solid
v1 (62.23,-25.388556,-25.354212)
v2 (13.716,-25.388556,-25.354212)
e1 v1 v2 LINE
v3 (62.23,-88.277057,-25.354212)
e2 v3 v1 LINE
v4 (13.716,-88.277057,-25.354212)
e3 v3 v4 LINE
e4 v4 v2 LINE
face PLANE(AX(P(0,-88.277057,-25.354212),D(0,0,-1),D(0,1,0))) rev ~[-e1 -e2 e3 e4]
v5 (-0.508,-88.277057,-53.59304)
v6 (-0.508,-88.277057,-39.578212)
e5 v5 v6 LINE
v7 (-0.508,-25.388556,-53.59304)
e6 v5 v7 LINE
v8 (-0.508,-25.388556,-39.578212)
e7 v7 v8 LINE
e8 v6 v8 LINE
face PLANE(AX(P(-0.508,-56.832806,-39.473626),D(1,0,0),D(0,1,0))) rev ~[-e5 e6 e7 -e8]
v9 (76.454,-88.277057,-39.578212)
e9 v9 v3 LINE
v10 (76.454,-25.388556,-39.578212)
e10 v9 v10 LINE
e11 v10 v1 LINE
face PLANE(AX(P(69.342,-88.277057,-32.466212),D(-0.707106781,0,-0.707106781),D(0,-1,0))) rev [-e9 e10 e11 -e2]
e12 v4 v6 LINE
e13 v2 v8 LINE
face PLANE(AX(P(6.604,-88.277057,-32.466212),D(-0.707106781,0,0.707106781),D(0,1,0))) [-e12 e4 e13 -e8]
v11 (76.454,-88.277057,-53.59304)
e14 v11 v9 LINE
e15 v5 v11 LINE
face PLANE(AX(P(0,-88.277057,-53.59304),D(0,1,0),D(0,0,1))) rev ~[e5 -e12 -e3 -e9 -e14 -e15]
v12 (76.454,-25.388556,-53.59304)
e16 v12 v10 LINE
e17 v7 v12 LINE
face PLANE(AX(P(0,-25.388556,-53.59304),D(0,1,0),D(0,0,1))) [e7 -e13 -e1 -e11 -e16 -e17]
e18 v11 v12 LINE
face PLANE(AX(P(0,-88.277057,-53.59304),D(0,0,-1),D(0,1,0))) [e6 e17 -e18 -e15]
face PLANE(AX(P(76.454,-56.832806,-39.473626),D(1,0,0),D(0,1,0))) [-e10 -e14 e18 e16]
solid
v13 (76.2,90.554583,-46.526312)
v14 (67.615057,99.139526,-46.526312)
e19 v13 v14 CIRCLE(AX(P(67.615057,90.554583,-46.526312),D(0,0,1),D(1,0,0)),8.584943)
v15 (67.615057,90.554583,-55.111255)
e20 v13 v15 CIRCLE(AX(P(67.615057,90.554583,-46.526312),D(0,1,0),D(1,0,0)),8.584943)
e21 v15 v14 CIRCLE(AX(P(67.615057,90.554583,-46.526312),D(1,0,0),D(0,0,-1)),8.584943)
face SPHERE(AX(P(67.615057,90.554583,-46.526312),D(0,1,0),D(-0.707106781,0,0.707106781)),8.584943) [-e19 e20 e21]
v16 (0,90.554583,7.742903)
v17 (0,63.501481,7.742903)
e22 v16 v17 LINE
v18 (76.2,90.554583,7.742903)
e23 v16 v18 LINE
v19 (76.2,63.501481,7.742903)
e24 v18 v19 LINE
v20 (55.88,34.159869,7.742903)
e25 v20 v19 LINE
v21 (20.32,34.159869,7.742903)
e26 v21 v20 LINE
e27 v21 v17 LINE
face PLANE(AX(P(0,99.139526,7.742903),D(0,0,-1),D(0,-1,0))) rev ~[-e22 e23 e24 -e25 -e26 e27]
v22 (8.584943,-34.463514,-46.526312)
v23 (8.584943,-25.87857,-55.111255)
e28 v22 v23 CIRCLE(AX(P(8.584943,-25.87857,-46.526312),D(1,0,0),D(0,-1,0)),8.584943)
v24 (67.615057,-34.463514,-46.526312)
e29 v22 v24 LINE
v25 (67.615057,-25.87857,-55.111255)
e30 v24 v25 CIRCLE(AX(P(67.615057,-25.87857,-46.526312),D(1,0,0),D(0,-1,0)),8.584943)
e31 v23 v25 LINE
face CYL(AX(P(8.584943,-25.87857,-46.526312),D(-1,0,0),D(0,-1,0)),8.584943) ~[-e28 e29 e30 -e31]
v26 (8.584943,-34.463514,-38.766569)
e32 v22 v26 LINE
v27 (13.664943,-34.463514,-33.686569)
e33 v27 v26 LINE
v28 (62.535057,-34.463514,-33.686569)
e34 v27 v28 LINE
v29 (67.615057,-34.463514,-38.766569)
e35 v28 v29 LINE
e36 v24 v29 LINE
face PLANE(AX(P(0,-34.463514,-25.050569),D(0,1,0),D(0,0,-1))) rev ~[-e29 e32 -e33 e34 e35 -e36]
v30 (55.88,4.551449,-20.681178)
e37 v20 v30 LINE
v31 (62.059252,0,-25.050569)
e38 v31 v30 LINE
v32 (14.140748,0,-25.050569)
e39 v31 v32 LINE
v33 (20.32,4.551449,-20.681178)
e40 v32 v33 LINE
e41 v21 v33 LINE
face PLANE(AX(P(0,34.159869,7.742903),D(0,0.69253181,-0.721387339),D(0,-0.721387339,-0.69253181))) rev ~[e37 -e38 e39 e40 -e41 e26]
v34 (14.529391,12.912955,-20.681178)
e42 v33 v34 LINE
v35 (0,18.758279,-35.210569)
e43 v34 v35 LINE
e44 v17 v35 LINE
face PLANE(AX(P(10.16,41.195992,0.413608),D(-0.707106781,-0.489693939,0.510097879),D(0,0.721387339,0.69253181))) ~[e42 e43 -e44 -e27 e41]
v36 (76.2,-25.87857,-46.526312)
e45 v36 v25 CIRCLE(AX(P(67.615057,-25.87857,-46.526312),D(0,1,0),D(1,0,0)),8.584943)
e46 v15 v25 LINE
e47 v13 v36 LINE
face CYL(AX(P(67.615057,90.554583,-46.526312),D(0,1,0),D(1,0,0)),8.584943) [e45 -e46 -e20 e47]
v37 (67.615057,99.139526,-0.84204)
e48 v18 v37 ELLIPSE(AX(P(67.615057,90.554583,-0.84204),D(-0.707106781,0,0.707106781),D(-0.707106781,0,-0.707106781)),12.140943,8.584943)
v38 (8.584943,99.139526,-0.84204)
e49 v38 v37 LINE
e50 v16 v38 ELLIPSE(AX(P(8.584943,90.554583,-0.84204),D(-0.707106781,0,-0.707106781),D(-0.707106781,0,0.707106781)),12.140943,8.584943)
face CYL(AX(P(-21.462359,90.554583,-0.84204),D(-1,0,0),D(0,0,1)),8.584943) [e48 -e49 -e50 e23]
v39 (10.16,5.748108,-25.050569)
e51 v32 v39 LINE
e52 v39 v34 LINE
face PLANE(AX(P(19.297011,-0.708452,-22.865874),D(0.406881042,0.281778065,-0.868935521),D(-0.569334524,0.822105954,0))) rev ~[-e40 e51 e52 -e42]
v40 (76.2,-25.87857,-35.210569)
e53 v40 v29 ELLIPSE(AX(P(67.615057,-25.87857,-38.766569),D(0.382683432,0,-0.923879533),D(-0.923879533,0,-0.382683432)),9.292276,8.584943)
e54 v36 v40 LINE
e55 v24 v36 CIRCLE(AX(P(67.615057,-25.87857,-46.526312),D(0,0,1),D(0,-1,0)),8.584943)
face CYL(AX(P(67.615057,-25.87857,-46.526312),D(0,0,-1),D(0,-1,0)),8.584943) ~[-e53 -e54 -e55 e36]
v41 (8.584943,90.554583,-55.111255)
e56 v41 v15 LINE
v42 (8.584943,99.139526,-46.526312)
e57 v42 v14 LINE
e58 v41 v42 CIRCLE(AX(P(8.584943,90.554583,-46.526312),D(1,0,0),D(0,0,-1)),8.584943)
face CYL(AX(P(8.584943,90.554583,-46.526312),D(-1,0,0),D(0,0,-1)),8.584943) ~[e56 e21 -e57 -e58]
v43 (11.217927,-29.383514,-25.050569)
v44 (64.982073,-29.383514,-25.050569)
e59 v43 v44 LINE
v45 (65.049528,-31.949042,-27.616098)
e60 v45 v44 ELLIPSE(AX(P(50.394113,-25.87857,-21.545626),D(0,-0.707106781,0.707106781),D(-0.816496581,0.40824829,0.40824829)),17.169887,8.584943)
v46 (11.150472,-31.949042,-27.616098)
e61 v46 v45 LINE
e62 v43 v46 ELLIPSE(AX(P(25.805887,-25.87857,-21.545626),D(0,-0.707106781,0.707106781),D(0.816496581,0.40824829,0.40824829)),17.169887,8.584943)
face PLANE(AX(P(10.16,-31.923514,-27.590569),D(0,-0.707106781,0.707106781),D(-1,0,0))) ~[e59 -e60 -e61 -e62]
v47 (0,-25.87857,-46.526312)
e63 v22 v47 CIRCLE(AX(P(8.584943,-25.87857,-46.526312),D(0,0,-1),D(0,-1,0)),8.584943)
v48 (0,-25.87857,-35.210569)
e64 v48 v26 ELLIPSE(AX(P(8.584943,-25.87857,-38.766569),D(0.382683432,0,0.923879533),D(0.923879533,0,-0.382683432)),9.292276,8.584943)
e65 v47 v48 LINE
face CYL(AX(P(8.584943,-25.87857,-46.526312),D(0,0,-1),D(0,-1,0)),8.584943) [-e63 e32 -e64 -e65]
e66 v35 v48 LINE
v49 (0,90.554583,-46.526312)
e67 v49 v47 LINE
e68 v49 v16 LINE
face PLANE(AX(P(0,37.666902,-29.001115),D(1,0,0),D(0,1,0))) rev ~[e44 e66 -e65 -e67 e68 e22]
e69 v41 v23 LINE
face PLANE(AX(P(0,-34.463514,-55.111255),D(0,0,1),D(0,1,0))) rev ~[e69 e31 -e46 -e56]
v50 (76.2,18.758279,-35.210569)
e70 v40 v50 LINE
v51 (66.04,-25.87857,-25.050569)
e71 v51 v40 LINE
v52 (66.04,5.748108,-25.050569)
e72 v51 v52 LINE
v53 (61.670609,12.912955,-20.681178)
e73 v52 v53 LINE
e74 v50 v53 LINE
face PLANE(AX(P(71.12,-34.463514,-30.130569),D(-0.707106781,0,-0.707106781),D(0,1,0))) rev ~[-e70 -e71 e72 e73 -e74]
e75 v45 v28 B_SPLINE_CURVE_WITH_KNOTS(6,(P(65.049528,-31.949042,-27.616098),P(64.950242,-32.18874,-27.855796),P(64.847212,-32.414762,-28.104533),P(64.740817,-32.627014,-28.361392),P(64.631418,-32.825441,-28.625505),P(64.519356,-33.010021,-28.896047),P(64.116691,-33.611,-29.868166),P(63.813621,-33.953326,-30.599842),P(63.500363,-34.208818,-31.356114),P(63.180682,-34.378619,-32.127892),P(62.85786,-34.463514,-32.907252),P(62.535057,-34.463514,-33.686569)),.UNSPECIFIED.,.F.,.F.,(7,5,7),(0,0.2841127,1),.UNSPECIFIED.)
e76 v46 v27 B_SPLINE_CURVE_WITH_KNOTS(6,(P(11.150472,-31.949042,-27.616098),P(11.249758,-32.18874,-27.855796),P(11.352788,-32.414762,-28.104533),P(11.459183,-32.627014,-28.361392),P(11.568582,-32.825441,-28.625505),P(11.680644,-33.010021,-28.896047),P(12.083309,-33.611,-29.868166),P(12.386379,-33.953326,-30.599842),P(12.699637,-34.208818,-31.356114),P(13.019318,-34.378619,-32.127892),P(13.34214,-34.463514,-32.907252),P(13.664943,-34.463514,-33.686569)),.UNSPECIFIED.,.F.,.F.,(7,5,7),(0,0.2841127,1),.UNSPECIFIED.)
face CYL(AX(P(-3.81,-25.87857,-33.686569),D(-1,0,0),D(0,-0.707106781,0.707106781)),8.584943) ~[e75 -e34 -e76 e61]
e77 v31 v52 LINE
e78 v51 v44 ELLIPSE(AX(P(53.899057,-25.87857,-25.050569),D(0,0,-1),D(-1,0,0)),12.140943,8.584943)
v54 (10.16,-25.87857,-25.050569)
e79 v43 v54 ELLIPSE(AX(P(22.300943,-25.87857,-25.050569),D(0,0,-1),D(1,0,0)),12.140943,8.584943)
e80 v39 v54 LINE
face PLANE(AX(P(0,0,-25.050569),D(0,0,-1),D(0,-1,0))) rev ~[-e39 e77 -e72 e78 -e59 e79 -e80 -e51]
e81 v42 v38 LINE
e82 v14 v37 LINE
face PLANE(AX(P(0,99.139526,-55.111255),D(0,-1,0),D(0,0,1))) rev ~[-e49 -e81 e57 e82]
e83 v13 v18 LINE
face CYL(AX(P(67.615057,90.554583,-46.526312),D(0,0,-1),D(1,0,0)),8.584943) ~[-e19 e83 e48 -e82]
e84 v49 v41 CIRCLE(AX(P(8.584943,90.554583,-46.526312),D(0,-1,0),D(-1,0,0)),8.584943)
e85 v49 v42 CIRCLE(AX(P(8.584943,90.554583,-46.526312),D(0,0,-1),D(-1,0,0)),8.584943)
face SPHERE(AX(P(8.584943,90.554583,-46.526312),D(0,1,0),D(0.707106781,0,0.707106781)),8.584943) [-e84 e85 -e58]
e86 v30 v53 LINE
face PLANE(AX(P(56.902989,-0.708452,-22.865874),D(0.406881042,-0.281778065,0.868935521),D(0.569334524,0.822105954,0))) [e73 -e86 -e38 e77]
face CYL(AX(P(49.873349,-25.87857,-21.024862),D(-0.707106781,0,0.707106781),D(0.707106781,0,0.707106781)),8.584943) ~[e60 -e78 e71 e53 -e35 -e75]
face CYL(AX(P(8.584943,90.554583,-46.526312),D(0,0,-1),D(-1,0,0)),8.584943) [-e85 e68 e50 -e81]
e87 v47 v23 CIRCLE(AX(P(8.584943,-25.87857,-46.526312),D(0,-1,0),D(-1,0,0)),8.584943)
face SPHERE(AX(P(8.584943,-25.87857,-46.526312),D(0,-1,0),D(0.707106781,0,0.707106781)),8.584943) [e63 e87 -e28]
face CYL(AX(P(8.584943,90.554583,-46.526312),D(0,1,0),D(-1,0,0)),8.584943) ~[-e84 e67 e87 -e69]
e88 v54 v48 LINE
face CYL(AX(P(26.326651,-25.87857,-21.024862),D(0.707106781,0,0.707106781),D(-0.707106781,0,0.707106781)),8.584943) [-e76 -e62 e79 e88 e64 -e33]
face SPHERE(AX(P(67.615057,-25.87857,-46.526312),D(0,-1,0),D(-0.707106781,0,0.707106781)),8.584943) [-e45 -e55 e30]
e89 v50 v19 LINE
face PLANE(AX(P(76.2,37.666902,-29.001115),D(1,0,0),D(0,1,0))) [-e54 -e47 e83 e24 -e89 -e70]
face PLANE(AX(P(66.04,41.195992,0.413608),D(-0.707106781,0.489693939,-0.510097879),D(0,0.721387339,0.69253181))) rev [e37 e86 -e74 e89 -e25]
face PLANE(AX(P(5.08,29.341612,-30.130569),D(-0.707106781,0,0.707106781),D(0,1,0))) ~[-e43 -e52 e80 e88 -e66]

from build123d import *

# Parameters (mm, degrees)
F1_DEPTH      = 76.2
F2_SIZE       = 20.32
F3_SIZE       = 10.16
F4_SIZE       = 5.08
F5_SIZE       = 5.08
F6_SIZE       = 5.08
F7_T1_DEPTH   = 50.1089220358
F7_T3_DEPTH   = 83.82
F7_T5_DEPTH   = 32.7781013128
F7_T7_DEPTH   = 50.1089220358
F7_T9_DEPTH   = 59.0301131444
F7_T11_DEPTH  = 116.4331532733
F7_T13_DEPTH  = 119.124717139
F7_T15_DEPTH  = 75.7315738338
F7_S19_W      = 8.5849434278
F7_S19_H      = 8.5849434278
F7_T20_DEPTH  = 8.5849434278
F7_S25_W      = 8.5849434278
F7_S25_H      = 8.5849434278
F7_T26_DEPTH  = 8.5849434278
F7_S31_W      = 8.5849434278
F7_S31_H      = 8.5849434278
F7_T32_DEPTH  = 8.5849434278
F7_S37_W      = 8.5849434278
F7_S37_H      = 8.5849434278
F7_T38_DEPTH  = 8.5849434278
F8_W          = 62.888501212
F8_H          = 28.2388273627
F9_DEPTH      = 76.454
F9_DEPTH_BACK = 0.508
F10_SIZE      = 14.224


# Not quite as in the source:
# - a fillet or chamfer that OpenCascade refuses, or shapes differently, is made with other operations: its cross-section is extruded or revolved along the edge and cut away or added


with BuildPart() as f1:
    # F0 (on Right) → F1 (new body)
    with BuildSketch(Plane.YZ):
        Polygon((0, -25.0505693257), (-34.4635136425, -25.0505693257), (-34.4635136425, -55.1112554967), (99.1395264864, -55.1112554967), (99.1395264864, 7.7429031953), (34.1598689556, 7.7429031953), align=None)
    extrude(amount=F1_DEPTH)

    # F2
    f2_edges = [f1.edges().sort_by_distance(p)[0] for p in [
        (76.2, 17.079934, -8.653833),
        (0, 17.079934, -8.653833),
    ]]
    chamfer(f2_edges, length=F2_SIZE)

    # F3
    f3_edges = [f1.edges().sort_by_distance(p)[0] for p in [
        (76.2, -17.231757, -25.050569),
        (0, -17.231757, -25.050569),
    ]]
    chamfer(f3_edges, length=F3_SIZE)

    # F4
    f4_edges = [f1.edges().sort_by_distance(p)[0] for p in [
        (60.96, 7.335403, -25.050569),
    ]]
    chamfer(f4_edges, length=F4_SIZE)

    # F5
    f5_edges = [f1.edges().sort_by_distance(p)[0] for p in [
        (15.24, 7.335403, -25.050569),
    ]]
    chamfer(f5_edges, length=F5_SIZE)

    # F6
    f6_edges = [f1.edges().sort_by_distance(p)[0] for p in [
        (38.1, -34.463514, -25.050569),
    ]]
    chamfer(f6_edges, length=F6_SIZE)

    # F7: fillet of radius 8.5849434278 on 12 edges, made by hand

    # F7_s2 → F7_t1 (cut)
    with BuildSketch(Plane(origin=(2.6508946219, 0, 2.6508946219), x_dir=(0, 1, 0), z_dir=(-0.7071067812, 0, -0.7071067812))):
        with BuildLine():
            ThreePointArc((-25.8785702148, 24.8976323396), (-31.9490419287, 27.4121040535), (-34.4635136425, 33.4825757674))
            Line((-34.4635136425, 33.4825757674), (-34.4635136425, 24.8976323396))
            Line((-34.4635136425, 24.8976323396), (-25.8785702148, 24.8976323396))
        make_face()
    extrude(amount=F7_T1_DEPTH, mode=Mode.SUBTRACT)

    # F7_s4 → F7_t3 (cut)
    with BuildSketch(Plane.YZ.offset(-3.81)):
        with BuildLine():
            ThreePointArc((-31.9490419287, -27.6160976118), (-33.8100237355, -30.4012537081), (-34.4635136425, -33.6865693257))
            Line((-34.4635136425, -33.6865693257), (-34.4635136425, -30.1305693257))
            Line((-34.4635136425, -30.1305693257), (-31.9490419287, -27.6160976118))
        make_face()
    extrude(amount=F7_T3_DEPTH, mode=Mode.SUBTRACT)

    # F7_s6 → F7_t5 (cut)
    with BuildSketch(Plane.XY.offset(-46.5263120689)):
        with BuildLine():
            ThreePointArc((8.5849434278, -34.4635136425), (2.5144717139, -31.9490419287), (0, -25.8785702148))
            Line((0, -25.8785702148), (0, -34.4635136425))
            Line((0, -34.4635136425), (8.5849434278, -34.4635136425))
        make_face()
        with BuildLine():
            ThreePointArc((67.6150565722, -34.4635136425), (73.6855282861, -31.9490419287), (76.2, -25.8785702148))
            Line((76.2, -25.8785702148), (76.2, -34.4635136425))
            Line((76.2, -34.4635136425), (67.6150565722, -34.4635136425))
        make_face()
    extrude(amount=F7_T5_DEPTH, mode=Mode.SUBTRACT)

    # F7_s8 → F7_t7 (cut)
    with BuildSketch(Plane(origin=(35.4491053781, 0, -35.4491053781), x_dir=(0, 1, 0), z_dir=(0.7071067812, 0, -0.7071067812))):
        with BuildLine():
            ThreePointArc((-25.8785702148, 28.9839043868), (-31.9490419287, 26.4694326729), (-34.4635136425, 20.398960959))
            Line((-34.4635136425, 20.398960959), (-34.4635136425, 28.9839043868))
            Line((-34.4635136425, 28.9839043868), (-25.8785702148, 28.9839043868))
        make_face()
    extrude(amount=F7_T7_DEPTH, mode=Mode.SUBTRACT)

    # F7_s10 → F7_t9 (cut)
    with BuildSketch(Plane.YZ.offset(8.5849434278)):
        with BuildLine():
            ThreePointArc((-34.4635136425, -46.5263120689), (-31.9490419287, -52.5967837828), (-25.8785702148, -55.1112554967))
            Line((-25.8785702148, -55.1112554967), (-34.4635136425, -55.1112554967))
            Line((-34.4635136425, -55.1112554967), (-34.4635136425, -46.5263120689))
        make_face()
        with BuildLine():
            ThreePointArc((90.5545830586, -55.1112554967), (96.6250547725, -52.5967837828), (99.1395264864, -46.5263120689))
            Line((99.1395264864, -46.5263120689), (99.1395264864, -55.1112554967))
            Line((99.1395264864, -55.1112554967), (90.5545830586, -55.1112554967))
        make_face()
    extrude(amount=F7_T9_DEPTH, mode=Mode.SUBTRACT)

    # F7_s12 → F7_t11 (cut)
    with BuildSketch(Plane.XZ.offset(-90.5545830586)):
        with BuildLine():
            ThreePointArc((0, -46.5263120689), (2.5144717139, -52.5967837828), (8.5849434278, -55.1112554967))
            Line((8.5849434278, -55.1112554967), (0, -55.1112554967))
            Line((0, -55.1112554967), (0, -46.5263120689))
        make_face()
        with BuildLine():
            ThreePointArc((76.2, -46.5263120689), (73.6855282861, -52.5967837828), (67.6150565722, -55.1112554967))
            Line((67.6150565722, -55.1112554967), (76.2, -55.1112554967))
            Line((76.2, -55.1112554967), (76.2, -46.5263120689))
        make_face()
    extrude(amount=F7_T11_DEPTH, mode=Mode.SUBTRACT)

    # F7_s14 → F7_t13 (cut)
    with BuildSketch(Plane.YZ.offset(-21.4623585695)):
        with BuildLine():
            ThreePointArc((90.5545830586, 7.7429031953), (96.6250547725, 5.2284314814), (99.1395264864, -0.8420402325))
            Line((99.1395264864, -0.8420402325), (99.1395264864, 7.7429031953))
            Line((99.1395264864, 7.7429031953), (90.5545830586, 7.7429031953))
        make_face()
    extrude(amount=F7_T13_DEPTH, mode=Mode.SUBTRACT)

    # F7_s16 → F7_t15 (cut)
    with BuildSketch(Plane.XY.offset(-46.5263120689)):
        with BuildLine():
            ThreePointArc((0, 90.5545830586), (2.5144717139, 96.6250547725), (8.5849434278, 99.1395264864))
            Line((8.5849434278, 99.1395264864), (0, 99.1395264864))
            Line((0, 99.1395264864), (0, 90.5545830586))
        make_face()
        with BuildLine():
            ThreePointArc((76.2, 90.5545830586), (73.6855282861, 96.6250547725), (67.6150565722, 99.1395264864))
            Line((67.6150565722, 99.1395264864), (76.2, 99.1395264864))
            Line((76.2, 99.1395264864), (76.2, 90.5545830586))
        make_face()
    extrude(amount=F7_T15_DEPTH, mode=Mode.SUBTRACT)


with BuildPart() as f7_tool18:
    # F7_s19 → F7_t20 (new body)
    with BuildSketch(Plane.XZ.offset(25.8785702148)):
        with Locations((4.2924717139, -50.8187837828)):
            Rectangle(F7_S19_W, F7_S19_H)
    extrude(amount=F7_T20_DEPTH)

    # F7_s21 → F7_t22 (revolve, cut)
    with BuildSketch(Plane(origin=(8.5849434278, -25.8785702148, -46.5263120689), x_dir=(0.7071067812, 0, 0.7071067812), z_dir=(0.7071067812, 0, -0.7071067812))):
        with BuildLine():
            ThreePointArc((0, -8.5849434278), (8.5849434278, 0), (0, 8.5849434278))
            Line((0, 8.5849434278), (0, -8.5849434278))
        make_face()
    revolve(axis=Axis((8.5849434278, -25.8785702148, -46.5263120689), (0, -1, 0)), mode=Mode.SUBTRACT)


with BuildPart() as f1_1:
    add(f1.part)

    # F7_t17: cut F7_tool18
    add(f7_tool18.part, mode=Mode.SUBTRACT)


with BuildPart() as f7_tool24:
    # F7_s25 → F7_t26 (new body)
    with BuildSketch(Plane.XZ.offset(25.8785702148)):
        with Locations((71.9075282861, -50.8187837828)):
            Rectangle(F7_S25_W, F7_S25_H)
    extrude(amount=F7_T26_DEPTH)

    # F7_s27 → F7_t28 (revolve, cut)
    with BuildSketch(Plane(origin=(67.6150565722, -25.8785702148, -46.5263120689), x_dir=(-0.7071067812, 0, 0.7071067812), z_dir=(0.7071067812, 0, 0.7071067812))):
        with BuildLine():
            ThreePointArc((0, -8.5849434278), (8.5849434278, 0), (0, 8.5849434278))
            Line((0, 8.5849434278), (0, -8.5849434278))
        make_face()
    revolve(axis=Axis((67.6150565722, -25.8785702148, -46.5263120689), (0, -1, 0)), mode=Mode.SUBTRACT)


with BuildPart() as f1_2:
    add(f1_1.part)

    # F7_t23: cut F7_tool24
    add(f7_tool24.part, mode=Mode.SUBTRACT)


with BuildPart() as f7_tool30:
    # F7_s31 → F7_t32 (new body)
    with BuildSketch(Plane.XZ.offset(-90.5545830586)):
        with Locations((4.2924717139, -50.8187837828)):
            Rectangle(F7_S31_W, F7_S31_H)
    extrude(amount=-F7_T32_DEPTH)

    # F7_s33 → F7_t34 (revolve, cut)
    with BuildSketch(Plane(origin=(8.5849434278, 90.5545830586, -46.5263120689), x_dir=(0.7071067812, 0, 0.7071067812), z_dir=(-0.7071067812, 0, 0.7071067812))):
        with BuildLine():
            ThreePointArc((0, -8.5849434278), (8.5849434278, 0), (0, 8.5849434278))
            Line((0, 8.5849434278), (0, -8.5849434278))
        make_face()
    revolve(axis=Axis((8.5849434278, 90.5545830586, -46.5263120689), (0, 1, 0)), mode=Mode.SUBTRACT)


with BuildPart() as f1_3:
    add(f1_2.part)

    # F7_t29: cut F7_tool30
    add(f7_tool30.part, mode=Mode.SUBTRACT)


with BuildPart() as f7_tool36:
    # F7_s37 → F7_t38 (new body)
    with BuildSketch(Plane.XZ.offset(-90.5545830586)):
        with Locations((71.9075282861, -50.8187837828)):
            Rectangle(F7_S37_W, F7_S37_H)
    extrude(amount=-F7_T38_DEPTH)

    # F7_s39 → F7_t40 (revolve, cut)
    with BuildSketch(Plane(origin=(67.6150565722, 90.5545830586, -46.5263120689), x_dir=(-0.7071067812, 0, 0.7071067812), z_dir=(-0.7071067812, 0, -0.7071067812))):
        with BuildLine():
            ThreePointArc((0, -8.5849434278), (8.5849434278, 0), (0, 8.5849434278))
            Line((0, 8.5849434278), (0, -8.5849434278))
        make_face()
    revolve(axis=Axis((67.6150565722, 90.5545830586, -46.5263120689), (0, 1, 0)), mode=Mode.SUBTRACT)


with BuildPart() as f1_4:
    add(f1_3.part)

    # F7_t35: cut F7_tool36
    add(f7_tool36.part, mode=Mode.SUBTRACT)


with BuildPart() as f9:
    # F8 (on Right) → F9 (new body, two sides)
    with BuildSketch(Plane.YZ) as f9_sk:
        with Locations((-56.8328062072, -39.4736258313)):
            Rectangle(F8_W, F8_H)
    extrude(amount=F9_DEPTH)
    extrude(f9_sk.sketch, amount=-F9_DEPTH_BACK)

    # F10
    f10_edges = [f9.edges().sort_by_distance(p)[0] for p in [
        (76.454, -56.832806, -25.354212),
        (-0.508, -56.832806, -25.354212),
    ]]
    chamfer(f10_edges, length=F10_SIZE)


solid = Compound([f1_4.part, f9.part])
